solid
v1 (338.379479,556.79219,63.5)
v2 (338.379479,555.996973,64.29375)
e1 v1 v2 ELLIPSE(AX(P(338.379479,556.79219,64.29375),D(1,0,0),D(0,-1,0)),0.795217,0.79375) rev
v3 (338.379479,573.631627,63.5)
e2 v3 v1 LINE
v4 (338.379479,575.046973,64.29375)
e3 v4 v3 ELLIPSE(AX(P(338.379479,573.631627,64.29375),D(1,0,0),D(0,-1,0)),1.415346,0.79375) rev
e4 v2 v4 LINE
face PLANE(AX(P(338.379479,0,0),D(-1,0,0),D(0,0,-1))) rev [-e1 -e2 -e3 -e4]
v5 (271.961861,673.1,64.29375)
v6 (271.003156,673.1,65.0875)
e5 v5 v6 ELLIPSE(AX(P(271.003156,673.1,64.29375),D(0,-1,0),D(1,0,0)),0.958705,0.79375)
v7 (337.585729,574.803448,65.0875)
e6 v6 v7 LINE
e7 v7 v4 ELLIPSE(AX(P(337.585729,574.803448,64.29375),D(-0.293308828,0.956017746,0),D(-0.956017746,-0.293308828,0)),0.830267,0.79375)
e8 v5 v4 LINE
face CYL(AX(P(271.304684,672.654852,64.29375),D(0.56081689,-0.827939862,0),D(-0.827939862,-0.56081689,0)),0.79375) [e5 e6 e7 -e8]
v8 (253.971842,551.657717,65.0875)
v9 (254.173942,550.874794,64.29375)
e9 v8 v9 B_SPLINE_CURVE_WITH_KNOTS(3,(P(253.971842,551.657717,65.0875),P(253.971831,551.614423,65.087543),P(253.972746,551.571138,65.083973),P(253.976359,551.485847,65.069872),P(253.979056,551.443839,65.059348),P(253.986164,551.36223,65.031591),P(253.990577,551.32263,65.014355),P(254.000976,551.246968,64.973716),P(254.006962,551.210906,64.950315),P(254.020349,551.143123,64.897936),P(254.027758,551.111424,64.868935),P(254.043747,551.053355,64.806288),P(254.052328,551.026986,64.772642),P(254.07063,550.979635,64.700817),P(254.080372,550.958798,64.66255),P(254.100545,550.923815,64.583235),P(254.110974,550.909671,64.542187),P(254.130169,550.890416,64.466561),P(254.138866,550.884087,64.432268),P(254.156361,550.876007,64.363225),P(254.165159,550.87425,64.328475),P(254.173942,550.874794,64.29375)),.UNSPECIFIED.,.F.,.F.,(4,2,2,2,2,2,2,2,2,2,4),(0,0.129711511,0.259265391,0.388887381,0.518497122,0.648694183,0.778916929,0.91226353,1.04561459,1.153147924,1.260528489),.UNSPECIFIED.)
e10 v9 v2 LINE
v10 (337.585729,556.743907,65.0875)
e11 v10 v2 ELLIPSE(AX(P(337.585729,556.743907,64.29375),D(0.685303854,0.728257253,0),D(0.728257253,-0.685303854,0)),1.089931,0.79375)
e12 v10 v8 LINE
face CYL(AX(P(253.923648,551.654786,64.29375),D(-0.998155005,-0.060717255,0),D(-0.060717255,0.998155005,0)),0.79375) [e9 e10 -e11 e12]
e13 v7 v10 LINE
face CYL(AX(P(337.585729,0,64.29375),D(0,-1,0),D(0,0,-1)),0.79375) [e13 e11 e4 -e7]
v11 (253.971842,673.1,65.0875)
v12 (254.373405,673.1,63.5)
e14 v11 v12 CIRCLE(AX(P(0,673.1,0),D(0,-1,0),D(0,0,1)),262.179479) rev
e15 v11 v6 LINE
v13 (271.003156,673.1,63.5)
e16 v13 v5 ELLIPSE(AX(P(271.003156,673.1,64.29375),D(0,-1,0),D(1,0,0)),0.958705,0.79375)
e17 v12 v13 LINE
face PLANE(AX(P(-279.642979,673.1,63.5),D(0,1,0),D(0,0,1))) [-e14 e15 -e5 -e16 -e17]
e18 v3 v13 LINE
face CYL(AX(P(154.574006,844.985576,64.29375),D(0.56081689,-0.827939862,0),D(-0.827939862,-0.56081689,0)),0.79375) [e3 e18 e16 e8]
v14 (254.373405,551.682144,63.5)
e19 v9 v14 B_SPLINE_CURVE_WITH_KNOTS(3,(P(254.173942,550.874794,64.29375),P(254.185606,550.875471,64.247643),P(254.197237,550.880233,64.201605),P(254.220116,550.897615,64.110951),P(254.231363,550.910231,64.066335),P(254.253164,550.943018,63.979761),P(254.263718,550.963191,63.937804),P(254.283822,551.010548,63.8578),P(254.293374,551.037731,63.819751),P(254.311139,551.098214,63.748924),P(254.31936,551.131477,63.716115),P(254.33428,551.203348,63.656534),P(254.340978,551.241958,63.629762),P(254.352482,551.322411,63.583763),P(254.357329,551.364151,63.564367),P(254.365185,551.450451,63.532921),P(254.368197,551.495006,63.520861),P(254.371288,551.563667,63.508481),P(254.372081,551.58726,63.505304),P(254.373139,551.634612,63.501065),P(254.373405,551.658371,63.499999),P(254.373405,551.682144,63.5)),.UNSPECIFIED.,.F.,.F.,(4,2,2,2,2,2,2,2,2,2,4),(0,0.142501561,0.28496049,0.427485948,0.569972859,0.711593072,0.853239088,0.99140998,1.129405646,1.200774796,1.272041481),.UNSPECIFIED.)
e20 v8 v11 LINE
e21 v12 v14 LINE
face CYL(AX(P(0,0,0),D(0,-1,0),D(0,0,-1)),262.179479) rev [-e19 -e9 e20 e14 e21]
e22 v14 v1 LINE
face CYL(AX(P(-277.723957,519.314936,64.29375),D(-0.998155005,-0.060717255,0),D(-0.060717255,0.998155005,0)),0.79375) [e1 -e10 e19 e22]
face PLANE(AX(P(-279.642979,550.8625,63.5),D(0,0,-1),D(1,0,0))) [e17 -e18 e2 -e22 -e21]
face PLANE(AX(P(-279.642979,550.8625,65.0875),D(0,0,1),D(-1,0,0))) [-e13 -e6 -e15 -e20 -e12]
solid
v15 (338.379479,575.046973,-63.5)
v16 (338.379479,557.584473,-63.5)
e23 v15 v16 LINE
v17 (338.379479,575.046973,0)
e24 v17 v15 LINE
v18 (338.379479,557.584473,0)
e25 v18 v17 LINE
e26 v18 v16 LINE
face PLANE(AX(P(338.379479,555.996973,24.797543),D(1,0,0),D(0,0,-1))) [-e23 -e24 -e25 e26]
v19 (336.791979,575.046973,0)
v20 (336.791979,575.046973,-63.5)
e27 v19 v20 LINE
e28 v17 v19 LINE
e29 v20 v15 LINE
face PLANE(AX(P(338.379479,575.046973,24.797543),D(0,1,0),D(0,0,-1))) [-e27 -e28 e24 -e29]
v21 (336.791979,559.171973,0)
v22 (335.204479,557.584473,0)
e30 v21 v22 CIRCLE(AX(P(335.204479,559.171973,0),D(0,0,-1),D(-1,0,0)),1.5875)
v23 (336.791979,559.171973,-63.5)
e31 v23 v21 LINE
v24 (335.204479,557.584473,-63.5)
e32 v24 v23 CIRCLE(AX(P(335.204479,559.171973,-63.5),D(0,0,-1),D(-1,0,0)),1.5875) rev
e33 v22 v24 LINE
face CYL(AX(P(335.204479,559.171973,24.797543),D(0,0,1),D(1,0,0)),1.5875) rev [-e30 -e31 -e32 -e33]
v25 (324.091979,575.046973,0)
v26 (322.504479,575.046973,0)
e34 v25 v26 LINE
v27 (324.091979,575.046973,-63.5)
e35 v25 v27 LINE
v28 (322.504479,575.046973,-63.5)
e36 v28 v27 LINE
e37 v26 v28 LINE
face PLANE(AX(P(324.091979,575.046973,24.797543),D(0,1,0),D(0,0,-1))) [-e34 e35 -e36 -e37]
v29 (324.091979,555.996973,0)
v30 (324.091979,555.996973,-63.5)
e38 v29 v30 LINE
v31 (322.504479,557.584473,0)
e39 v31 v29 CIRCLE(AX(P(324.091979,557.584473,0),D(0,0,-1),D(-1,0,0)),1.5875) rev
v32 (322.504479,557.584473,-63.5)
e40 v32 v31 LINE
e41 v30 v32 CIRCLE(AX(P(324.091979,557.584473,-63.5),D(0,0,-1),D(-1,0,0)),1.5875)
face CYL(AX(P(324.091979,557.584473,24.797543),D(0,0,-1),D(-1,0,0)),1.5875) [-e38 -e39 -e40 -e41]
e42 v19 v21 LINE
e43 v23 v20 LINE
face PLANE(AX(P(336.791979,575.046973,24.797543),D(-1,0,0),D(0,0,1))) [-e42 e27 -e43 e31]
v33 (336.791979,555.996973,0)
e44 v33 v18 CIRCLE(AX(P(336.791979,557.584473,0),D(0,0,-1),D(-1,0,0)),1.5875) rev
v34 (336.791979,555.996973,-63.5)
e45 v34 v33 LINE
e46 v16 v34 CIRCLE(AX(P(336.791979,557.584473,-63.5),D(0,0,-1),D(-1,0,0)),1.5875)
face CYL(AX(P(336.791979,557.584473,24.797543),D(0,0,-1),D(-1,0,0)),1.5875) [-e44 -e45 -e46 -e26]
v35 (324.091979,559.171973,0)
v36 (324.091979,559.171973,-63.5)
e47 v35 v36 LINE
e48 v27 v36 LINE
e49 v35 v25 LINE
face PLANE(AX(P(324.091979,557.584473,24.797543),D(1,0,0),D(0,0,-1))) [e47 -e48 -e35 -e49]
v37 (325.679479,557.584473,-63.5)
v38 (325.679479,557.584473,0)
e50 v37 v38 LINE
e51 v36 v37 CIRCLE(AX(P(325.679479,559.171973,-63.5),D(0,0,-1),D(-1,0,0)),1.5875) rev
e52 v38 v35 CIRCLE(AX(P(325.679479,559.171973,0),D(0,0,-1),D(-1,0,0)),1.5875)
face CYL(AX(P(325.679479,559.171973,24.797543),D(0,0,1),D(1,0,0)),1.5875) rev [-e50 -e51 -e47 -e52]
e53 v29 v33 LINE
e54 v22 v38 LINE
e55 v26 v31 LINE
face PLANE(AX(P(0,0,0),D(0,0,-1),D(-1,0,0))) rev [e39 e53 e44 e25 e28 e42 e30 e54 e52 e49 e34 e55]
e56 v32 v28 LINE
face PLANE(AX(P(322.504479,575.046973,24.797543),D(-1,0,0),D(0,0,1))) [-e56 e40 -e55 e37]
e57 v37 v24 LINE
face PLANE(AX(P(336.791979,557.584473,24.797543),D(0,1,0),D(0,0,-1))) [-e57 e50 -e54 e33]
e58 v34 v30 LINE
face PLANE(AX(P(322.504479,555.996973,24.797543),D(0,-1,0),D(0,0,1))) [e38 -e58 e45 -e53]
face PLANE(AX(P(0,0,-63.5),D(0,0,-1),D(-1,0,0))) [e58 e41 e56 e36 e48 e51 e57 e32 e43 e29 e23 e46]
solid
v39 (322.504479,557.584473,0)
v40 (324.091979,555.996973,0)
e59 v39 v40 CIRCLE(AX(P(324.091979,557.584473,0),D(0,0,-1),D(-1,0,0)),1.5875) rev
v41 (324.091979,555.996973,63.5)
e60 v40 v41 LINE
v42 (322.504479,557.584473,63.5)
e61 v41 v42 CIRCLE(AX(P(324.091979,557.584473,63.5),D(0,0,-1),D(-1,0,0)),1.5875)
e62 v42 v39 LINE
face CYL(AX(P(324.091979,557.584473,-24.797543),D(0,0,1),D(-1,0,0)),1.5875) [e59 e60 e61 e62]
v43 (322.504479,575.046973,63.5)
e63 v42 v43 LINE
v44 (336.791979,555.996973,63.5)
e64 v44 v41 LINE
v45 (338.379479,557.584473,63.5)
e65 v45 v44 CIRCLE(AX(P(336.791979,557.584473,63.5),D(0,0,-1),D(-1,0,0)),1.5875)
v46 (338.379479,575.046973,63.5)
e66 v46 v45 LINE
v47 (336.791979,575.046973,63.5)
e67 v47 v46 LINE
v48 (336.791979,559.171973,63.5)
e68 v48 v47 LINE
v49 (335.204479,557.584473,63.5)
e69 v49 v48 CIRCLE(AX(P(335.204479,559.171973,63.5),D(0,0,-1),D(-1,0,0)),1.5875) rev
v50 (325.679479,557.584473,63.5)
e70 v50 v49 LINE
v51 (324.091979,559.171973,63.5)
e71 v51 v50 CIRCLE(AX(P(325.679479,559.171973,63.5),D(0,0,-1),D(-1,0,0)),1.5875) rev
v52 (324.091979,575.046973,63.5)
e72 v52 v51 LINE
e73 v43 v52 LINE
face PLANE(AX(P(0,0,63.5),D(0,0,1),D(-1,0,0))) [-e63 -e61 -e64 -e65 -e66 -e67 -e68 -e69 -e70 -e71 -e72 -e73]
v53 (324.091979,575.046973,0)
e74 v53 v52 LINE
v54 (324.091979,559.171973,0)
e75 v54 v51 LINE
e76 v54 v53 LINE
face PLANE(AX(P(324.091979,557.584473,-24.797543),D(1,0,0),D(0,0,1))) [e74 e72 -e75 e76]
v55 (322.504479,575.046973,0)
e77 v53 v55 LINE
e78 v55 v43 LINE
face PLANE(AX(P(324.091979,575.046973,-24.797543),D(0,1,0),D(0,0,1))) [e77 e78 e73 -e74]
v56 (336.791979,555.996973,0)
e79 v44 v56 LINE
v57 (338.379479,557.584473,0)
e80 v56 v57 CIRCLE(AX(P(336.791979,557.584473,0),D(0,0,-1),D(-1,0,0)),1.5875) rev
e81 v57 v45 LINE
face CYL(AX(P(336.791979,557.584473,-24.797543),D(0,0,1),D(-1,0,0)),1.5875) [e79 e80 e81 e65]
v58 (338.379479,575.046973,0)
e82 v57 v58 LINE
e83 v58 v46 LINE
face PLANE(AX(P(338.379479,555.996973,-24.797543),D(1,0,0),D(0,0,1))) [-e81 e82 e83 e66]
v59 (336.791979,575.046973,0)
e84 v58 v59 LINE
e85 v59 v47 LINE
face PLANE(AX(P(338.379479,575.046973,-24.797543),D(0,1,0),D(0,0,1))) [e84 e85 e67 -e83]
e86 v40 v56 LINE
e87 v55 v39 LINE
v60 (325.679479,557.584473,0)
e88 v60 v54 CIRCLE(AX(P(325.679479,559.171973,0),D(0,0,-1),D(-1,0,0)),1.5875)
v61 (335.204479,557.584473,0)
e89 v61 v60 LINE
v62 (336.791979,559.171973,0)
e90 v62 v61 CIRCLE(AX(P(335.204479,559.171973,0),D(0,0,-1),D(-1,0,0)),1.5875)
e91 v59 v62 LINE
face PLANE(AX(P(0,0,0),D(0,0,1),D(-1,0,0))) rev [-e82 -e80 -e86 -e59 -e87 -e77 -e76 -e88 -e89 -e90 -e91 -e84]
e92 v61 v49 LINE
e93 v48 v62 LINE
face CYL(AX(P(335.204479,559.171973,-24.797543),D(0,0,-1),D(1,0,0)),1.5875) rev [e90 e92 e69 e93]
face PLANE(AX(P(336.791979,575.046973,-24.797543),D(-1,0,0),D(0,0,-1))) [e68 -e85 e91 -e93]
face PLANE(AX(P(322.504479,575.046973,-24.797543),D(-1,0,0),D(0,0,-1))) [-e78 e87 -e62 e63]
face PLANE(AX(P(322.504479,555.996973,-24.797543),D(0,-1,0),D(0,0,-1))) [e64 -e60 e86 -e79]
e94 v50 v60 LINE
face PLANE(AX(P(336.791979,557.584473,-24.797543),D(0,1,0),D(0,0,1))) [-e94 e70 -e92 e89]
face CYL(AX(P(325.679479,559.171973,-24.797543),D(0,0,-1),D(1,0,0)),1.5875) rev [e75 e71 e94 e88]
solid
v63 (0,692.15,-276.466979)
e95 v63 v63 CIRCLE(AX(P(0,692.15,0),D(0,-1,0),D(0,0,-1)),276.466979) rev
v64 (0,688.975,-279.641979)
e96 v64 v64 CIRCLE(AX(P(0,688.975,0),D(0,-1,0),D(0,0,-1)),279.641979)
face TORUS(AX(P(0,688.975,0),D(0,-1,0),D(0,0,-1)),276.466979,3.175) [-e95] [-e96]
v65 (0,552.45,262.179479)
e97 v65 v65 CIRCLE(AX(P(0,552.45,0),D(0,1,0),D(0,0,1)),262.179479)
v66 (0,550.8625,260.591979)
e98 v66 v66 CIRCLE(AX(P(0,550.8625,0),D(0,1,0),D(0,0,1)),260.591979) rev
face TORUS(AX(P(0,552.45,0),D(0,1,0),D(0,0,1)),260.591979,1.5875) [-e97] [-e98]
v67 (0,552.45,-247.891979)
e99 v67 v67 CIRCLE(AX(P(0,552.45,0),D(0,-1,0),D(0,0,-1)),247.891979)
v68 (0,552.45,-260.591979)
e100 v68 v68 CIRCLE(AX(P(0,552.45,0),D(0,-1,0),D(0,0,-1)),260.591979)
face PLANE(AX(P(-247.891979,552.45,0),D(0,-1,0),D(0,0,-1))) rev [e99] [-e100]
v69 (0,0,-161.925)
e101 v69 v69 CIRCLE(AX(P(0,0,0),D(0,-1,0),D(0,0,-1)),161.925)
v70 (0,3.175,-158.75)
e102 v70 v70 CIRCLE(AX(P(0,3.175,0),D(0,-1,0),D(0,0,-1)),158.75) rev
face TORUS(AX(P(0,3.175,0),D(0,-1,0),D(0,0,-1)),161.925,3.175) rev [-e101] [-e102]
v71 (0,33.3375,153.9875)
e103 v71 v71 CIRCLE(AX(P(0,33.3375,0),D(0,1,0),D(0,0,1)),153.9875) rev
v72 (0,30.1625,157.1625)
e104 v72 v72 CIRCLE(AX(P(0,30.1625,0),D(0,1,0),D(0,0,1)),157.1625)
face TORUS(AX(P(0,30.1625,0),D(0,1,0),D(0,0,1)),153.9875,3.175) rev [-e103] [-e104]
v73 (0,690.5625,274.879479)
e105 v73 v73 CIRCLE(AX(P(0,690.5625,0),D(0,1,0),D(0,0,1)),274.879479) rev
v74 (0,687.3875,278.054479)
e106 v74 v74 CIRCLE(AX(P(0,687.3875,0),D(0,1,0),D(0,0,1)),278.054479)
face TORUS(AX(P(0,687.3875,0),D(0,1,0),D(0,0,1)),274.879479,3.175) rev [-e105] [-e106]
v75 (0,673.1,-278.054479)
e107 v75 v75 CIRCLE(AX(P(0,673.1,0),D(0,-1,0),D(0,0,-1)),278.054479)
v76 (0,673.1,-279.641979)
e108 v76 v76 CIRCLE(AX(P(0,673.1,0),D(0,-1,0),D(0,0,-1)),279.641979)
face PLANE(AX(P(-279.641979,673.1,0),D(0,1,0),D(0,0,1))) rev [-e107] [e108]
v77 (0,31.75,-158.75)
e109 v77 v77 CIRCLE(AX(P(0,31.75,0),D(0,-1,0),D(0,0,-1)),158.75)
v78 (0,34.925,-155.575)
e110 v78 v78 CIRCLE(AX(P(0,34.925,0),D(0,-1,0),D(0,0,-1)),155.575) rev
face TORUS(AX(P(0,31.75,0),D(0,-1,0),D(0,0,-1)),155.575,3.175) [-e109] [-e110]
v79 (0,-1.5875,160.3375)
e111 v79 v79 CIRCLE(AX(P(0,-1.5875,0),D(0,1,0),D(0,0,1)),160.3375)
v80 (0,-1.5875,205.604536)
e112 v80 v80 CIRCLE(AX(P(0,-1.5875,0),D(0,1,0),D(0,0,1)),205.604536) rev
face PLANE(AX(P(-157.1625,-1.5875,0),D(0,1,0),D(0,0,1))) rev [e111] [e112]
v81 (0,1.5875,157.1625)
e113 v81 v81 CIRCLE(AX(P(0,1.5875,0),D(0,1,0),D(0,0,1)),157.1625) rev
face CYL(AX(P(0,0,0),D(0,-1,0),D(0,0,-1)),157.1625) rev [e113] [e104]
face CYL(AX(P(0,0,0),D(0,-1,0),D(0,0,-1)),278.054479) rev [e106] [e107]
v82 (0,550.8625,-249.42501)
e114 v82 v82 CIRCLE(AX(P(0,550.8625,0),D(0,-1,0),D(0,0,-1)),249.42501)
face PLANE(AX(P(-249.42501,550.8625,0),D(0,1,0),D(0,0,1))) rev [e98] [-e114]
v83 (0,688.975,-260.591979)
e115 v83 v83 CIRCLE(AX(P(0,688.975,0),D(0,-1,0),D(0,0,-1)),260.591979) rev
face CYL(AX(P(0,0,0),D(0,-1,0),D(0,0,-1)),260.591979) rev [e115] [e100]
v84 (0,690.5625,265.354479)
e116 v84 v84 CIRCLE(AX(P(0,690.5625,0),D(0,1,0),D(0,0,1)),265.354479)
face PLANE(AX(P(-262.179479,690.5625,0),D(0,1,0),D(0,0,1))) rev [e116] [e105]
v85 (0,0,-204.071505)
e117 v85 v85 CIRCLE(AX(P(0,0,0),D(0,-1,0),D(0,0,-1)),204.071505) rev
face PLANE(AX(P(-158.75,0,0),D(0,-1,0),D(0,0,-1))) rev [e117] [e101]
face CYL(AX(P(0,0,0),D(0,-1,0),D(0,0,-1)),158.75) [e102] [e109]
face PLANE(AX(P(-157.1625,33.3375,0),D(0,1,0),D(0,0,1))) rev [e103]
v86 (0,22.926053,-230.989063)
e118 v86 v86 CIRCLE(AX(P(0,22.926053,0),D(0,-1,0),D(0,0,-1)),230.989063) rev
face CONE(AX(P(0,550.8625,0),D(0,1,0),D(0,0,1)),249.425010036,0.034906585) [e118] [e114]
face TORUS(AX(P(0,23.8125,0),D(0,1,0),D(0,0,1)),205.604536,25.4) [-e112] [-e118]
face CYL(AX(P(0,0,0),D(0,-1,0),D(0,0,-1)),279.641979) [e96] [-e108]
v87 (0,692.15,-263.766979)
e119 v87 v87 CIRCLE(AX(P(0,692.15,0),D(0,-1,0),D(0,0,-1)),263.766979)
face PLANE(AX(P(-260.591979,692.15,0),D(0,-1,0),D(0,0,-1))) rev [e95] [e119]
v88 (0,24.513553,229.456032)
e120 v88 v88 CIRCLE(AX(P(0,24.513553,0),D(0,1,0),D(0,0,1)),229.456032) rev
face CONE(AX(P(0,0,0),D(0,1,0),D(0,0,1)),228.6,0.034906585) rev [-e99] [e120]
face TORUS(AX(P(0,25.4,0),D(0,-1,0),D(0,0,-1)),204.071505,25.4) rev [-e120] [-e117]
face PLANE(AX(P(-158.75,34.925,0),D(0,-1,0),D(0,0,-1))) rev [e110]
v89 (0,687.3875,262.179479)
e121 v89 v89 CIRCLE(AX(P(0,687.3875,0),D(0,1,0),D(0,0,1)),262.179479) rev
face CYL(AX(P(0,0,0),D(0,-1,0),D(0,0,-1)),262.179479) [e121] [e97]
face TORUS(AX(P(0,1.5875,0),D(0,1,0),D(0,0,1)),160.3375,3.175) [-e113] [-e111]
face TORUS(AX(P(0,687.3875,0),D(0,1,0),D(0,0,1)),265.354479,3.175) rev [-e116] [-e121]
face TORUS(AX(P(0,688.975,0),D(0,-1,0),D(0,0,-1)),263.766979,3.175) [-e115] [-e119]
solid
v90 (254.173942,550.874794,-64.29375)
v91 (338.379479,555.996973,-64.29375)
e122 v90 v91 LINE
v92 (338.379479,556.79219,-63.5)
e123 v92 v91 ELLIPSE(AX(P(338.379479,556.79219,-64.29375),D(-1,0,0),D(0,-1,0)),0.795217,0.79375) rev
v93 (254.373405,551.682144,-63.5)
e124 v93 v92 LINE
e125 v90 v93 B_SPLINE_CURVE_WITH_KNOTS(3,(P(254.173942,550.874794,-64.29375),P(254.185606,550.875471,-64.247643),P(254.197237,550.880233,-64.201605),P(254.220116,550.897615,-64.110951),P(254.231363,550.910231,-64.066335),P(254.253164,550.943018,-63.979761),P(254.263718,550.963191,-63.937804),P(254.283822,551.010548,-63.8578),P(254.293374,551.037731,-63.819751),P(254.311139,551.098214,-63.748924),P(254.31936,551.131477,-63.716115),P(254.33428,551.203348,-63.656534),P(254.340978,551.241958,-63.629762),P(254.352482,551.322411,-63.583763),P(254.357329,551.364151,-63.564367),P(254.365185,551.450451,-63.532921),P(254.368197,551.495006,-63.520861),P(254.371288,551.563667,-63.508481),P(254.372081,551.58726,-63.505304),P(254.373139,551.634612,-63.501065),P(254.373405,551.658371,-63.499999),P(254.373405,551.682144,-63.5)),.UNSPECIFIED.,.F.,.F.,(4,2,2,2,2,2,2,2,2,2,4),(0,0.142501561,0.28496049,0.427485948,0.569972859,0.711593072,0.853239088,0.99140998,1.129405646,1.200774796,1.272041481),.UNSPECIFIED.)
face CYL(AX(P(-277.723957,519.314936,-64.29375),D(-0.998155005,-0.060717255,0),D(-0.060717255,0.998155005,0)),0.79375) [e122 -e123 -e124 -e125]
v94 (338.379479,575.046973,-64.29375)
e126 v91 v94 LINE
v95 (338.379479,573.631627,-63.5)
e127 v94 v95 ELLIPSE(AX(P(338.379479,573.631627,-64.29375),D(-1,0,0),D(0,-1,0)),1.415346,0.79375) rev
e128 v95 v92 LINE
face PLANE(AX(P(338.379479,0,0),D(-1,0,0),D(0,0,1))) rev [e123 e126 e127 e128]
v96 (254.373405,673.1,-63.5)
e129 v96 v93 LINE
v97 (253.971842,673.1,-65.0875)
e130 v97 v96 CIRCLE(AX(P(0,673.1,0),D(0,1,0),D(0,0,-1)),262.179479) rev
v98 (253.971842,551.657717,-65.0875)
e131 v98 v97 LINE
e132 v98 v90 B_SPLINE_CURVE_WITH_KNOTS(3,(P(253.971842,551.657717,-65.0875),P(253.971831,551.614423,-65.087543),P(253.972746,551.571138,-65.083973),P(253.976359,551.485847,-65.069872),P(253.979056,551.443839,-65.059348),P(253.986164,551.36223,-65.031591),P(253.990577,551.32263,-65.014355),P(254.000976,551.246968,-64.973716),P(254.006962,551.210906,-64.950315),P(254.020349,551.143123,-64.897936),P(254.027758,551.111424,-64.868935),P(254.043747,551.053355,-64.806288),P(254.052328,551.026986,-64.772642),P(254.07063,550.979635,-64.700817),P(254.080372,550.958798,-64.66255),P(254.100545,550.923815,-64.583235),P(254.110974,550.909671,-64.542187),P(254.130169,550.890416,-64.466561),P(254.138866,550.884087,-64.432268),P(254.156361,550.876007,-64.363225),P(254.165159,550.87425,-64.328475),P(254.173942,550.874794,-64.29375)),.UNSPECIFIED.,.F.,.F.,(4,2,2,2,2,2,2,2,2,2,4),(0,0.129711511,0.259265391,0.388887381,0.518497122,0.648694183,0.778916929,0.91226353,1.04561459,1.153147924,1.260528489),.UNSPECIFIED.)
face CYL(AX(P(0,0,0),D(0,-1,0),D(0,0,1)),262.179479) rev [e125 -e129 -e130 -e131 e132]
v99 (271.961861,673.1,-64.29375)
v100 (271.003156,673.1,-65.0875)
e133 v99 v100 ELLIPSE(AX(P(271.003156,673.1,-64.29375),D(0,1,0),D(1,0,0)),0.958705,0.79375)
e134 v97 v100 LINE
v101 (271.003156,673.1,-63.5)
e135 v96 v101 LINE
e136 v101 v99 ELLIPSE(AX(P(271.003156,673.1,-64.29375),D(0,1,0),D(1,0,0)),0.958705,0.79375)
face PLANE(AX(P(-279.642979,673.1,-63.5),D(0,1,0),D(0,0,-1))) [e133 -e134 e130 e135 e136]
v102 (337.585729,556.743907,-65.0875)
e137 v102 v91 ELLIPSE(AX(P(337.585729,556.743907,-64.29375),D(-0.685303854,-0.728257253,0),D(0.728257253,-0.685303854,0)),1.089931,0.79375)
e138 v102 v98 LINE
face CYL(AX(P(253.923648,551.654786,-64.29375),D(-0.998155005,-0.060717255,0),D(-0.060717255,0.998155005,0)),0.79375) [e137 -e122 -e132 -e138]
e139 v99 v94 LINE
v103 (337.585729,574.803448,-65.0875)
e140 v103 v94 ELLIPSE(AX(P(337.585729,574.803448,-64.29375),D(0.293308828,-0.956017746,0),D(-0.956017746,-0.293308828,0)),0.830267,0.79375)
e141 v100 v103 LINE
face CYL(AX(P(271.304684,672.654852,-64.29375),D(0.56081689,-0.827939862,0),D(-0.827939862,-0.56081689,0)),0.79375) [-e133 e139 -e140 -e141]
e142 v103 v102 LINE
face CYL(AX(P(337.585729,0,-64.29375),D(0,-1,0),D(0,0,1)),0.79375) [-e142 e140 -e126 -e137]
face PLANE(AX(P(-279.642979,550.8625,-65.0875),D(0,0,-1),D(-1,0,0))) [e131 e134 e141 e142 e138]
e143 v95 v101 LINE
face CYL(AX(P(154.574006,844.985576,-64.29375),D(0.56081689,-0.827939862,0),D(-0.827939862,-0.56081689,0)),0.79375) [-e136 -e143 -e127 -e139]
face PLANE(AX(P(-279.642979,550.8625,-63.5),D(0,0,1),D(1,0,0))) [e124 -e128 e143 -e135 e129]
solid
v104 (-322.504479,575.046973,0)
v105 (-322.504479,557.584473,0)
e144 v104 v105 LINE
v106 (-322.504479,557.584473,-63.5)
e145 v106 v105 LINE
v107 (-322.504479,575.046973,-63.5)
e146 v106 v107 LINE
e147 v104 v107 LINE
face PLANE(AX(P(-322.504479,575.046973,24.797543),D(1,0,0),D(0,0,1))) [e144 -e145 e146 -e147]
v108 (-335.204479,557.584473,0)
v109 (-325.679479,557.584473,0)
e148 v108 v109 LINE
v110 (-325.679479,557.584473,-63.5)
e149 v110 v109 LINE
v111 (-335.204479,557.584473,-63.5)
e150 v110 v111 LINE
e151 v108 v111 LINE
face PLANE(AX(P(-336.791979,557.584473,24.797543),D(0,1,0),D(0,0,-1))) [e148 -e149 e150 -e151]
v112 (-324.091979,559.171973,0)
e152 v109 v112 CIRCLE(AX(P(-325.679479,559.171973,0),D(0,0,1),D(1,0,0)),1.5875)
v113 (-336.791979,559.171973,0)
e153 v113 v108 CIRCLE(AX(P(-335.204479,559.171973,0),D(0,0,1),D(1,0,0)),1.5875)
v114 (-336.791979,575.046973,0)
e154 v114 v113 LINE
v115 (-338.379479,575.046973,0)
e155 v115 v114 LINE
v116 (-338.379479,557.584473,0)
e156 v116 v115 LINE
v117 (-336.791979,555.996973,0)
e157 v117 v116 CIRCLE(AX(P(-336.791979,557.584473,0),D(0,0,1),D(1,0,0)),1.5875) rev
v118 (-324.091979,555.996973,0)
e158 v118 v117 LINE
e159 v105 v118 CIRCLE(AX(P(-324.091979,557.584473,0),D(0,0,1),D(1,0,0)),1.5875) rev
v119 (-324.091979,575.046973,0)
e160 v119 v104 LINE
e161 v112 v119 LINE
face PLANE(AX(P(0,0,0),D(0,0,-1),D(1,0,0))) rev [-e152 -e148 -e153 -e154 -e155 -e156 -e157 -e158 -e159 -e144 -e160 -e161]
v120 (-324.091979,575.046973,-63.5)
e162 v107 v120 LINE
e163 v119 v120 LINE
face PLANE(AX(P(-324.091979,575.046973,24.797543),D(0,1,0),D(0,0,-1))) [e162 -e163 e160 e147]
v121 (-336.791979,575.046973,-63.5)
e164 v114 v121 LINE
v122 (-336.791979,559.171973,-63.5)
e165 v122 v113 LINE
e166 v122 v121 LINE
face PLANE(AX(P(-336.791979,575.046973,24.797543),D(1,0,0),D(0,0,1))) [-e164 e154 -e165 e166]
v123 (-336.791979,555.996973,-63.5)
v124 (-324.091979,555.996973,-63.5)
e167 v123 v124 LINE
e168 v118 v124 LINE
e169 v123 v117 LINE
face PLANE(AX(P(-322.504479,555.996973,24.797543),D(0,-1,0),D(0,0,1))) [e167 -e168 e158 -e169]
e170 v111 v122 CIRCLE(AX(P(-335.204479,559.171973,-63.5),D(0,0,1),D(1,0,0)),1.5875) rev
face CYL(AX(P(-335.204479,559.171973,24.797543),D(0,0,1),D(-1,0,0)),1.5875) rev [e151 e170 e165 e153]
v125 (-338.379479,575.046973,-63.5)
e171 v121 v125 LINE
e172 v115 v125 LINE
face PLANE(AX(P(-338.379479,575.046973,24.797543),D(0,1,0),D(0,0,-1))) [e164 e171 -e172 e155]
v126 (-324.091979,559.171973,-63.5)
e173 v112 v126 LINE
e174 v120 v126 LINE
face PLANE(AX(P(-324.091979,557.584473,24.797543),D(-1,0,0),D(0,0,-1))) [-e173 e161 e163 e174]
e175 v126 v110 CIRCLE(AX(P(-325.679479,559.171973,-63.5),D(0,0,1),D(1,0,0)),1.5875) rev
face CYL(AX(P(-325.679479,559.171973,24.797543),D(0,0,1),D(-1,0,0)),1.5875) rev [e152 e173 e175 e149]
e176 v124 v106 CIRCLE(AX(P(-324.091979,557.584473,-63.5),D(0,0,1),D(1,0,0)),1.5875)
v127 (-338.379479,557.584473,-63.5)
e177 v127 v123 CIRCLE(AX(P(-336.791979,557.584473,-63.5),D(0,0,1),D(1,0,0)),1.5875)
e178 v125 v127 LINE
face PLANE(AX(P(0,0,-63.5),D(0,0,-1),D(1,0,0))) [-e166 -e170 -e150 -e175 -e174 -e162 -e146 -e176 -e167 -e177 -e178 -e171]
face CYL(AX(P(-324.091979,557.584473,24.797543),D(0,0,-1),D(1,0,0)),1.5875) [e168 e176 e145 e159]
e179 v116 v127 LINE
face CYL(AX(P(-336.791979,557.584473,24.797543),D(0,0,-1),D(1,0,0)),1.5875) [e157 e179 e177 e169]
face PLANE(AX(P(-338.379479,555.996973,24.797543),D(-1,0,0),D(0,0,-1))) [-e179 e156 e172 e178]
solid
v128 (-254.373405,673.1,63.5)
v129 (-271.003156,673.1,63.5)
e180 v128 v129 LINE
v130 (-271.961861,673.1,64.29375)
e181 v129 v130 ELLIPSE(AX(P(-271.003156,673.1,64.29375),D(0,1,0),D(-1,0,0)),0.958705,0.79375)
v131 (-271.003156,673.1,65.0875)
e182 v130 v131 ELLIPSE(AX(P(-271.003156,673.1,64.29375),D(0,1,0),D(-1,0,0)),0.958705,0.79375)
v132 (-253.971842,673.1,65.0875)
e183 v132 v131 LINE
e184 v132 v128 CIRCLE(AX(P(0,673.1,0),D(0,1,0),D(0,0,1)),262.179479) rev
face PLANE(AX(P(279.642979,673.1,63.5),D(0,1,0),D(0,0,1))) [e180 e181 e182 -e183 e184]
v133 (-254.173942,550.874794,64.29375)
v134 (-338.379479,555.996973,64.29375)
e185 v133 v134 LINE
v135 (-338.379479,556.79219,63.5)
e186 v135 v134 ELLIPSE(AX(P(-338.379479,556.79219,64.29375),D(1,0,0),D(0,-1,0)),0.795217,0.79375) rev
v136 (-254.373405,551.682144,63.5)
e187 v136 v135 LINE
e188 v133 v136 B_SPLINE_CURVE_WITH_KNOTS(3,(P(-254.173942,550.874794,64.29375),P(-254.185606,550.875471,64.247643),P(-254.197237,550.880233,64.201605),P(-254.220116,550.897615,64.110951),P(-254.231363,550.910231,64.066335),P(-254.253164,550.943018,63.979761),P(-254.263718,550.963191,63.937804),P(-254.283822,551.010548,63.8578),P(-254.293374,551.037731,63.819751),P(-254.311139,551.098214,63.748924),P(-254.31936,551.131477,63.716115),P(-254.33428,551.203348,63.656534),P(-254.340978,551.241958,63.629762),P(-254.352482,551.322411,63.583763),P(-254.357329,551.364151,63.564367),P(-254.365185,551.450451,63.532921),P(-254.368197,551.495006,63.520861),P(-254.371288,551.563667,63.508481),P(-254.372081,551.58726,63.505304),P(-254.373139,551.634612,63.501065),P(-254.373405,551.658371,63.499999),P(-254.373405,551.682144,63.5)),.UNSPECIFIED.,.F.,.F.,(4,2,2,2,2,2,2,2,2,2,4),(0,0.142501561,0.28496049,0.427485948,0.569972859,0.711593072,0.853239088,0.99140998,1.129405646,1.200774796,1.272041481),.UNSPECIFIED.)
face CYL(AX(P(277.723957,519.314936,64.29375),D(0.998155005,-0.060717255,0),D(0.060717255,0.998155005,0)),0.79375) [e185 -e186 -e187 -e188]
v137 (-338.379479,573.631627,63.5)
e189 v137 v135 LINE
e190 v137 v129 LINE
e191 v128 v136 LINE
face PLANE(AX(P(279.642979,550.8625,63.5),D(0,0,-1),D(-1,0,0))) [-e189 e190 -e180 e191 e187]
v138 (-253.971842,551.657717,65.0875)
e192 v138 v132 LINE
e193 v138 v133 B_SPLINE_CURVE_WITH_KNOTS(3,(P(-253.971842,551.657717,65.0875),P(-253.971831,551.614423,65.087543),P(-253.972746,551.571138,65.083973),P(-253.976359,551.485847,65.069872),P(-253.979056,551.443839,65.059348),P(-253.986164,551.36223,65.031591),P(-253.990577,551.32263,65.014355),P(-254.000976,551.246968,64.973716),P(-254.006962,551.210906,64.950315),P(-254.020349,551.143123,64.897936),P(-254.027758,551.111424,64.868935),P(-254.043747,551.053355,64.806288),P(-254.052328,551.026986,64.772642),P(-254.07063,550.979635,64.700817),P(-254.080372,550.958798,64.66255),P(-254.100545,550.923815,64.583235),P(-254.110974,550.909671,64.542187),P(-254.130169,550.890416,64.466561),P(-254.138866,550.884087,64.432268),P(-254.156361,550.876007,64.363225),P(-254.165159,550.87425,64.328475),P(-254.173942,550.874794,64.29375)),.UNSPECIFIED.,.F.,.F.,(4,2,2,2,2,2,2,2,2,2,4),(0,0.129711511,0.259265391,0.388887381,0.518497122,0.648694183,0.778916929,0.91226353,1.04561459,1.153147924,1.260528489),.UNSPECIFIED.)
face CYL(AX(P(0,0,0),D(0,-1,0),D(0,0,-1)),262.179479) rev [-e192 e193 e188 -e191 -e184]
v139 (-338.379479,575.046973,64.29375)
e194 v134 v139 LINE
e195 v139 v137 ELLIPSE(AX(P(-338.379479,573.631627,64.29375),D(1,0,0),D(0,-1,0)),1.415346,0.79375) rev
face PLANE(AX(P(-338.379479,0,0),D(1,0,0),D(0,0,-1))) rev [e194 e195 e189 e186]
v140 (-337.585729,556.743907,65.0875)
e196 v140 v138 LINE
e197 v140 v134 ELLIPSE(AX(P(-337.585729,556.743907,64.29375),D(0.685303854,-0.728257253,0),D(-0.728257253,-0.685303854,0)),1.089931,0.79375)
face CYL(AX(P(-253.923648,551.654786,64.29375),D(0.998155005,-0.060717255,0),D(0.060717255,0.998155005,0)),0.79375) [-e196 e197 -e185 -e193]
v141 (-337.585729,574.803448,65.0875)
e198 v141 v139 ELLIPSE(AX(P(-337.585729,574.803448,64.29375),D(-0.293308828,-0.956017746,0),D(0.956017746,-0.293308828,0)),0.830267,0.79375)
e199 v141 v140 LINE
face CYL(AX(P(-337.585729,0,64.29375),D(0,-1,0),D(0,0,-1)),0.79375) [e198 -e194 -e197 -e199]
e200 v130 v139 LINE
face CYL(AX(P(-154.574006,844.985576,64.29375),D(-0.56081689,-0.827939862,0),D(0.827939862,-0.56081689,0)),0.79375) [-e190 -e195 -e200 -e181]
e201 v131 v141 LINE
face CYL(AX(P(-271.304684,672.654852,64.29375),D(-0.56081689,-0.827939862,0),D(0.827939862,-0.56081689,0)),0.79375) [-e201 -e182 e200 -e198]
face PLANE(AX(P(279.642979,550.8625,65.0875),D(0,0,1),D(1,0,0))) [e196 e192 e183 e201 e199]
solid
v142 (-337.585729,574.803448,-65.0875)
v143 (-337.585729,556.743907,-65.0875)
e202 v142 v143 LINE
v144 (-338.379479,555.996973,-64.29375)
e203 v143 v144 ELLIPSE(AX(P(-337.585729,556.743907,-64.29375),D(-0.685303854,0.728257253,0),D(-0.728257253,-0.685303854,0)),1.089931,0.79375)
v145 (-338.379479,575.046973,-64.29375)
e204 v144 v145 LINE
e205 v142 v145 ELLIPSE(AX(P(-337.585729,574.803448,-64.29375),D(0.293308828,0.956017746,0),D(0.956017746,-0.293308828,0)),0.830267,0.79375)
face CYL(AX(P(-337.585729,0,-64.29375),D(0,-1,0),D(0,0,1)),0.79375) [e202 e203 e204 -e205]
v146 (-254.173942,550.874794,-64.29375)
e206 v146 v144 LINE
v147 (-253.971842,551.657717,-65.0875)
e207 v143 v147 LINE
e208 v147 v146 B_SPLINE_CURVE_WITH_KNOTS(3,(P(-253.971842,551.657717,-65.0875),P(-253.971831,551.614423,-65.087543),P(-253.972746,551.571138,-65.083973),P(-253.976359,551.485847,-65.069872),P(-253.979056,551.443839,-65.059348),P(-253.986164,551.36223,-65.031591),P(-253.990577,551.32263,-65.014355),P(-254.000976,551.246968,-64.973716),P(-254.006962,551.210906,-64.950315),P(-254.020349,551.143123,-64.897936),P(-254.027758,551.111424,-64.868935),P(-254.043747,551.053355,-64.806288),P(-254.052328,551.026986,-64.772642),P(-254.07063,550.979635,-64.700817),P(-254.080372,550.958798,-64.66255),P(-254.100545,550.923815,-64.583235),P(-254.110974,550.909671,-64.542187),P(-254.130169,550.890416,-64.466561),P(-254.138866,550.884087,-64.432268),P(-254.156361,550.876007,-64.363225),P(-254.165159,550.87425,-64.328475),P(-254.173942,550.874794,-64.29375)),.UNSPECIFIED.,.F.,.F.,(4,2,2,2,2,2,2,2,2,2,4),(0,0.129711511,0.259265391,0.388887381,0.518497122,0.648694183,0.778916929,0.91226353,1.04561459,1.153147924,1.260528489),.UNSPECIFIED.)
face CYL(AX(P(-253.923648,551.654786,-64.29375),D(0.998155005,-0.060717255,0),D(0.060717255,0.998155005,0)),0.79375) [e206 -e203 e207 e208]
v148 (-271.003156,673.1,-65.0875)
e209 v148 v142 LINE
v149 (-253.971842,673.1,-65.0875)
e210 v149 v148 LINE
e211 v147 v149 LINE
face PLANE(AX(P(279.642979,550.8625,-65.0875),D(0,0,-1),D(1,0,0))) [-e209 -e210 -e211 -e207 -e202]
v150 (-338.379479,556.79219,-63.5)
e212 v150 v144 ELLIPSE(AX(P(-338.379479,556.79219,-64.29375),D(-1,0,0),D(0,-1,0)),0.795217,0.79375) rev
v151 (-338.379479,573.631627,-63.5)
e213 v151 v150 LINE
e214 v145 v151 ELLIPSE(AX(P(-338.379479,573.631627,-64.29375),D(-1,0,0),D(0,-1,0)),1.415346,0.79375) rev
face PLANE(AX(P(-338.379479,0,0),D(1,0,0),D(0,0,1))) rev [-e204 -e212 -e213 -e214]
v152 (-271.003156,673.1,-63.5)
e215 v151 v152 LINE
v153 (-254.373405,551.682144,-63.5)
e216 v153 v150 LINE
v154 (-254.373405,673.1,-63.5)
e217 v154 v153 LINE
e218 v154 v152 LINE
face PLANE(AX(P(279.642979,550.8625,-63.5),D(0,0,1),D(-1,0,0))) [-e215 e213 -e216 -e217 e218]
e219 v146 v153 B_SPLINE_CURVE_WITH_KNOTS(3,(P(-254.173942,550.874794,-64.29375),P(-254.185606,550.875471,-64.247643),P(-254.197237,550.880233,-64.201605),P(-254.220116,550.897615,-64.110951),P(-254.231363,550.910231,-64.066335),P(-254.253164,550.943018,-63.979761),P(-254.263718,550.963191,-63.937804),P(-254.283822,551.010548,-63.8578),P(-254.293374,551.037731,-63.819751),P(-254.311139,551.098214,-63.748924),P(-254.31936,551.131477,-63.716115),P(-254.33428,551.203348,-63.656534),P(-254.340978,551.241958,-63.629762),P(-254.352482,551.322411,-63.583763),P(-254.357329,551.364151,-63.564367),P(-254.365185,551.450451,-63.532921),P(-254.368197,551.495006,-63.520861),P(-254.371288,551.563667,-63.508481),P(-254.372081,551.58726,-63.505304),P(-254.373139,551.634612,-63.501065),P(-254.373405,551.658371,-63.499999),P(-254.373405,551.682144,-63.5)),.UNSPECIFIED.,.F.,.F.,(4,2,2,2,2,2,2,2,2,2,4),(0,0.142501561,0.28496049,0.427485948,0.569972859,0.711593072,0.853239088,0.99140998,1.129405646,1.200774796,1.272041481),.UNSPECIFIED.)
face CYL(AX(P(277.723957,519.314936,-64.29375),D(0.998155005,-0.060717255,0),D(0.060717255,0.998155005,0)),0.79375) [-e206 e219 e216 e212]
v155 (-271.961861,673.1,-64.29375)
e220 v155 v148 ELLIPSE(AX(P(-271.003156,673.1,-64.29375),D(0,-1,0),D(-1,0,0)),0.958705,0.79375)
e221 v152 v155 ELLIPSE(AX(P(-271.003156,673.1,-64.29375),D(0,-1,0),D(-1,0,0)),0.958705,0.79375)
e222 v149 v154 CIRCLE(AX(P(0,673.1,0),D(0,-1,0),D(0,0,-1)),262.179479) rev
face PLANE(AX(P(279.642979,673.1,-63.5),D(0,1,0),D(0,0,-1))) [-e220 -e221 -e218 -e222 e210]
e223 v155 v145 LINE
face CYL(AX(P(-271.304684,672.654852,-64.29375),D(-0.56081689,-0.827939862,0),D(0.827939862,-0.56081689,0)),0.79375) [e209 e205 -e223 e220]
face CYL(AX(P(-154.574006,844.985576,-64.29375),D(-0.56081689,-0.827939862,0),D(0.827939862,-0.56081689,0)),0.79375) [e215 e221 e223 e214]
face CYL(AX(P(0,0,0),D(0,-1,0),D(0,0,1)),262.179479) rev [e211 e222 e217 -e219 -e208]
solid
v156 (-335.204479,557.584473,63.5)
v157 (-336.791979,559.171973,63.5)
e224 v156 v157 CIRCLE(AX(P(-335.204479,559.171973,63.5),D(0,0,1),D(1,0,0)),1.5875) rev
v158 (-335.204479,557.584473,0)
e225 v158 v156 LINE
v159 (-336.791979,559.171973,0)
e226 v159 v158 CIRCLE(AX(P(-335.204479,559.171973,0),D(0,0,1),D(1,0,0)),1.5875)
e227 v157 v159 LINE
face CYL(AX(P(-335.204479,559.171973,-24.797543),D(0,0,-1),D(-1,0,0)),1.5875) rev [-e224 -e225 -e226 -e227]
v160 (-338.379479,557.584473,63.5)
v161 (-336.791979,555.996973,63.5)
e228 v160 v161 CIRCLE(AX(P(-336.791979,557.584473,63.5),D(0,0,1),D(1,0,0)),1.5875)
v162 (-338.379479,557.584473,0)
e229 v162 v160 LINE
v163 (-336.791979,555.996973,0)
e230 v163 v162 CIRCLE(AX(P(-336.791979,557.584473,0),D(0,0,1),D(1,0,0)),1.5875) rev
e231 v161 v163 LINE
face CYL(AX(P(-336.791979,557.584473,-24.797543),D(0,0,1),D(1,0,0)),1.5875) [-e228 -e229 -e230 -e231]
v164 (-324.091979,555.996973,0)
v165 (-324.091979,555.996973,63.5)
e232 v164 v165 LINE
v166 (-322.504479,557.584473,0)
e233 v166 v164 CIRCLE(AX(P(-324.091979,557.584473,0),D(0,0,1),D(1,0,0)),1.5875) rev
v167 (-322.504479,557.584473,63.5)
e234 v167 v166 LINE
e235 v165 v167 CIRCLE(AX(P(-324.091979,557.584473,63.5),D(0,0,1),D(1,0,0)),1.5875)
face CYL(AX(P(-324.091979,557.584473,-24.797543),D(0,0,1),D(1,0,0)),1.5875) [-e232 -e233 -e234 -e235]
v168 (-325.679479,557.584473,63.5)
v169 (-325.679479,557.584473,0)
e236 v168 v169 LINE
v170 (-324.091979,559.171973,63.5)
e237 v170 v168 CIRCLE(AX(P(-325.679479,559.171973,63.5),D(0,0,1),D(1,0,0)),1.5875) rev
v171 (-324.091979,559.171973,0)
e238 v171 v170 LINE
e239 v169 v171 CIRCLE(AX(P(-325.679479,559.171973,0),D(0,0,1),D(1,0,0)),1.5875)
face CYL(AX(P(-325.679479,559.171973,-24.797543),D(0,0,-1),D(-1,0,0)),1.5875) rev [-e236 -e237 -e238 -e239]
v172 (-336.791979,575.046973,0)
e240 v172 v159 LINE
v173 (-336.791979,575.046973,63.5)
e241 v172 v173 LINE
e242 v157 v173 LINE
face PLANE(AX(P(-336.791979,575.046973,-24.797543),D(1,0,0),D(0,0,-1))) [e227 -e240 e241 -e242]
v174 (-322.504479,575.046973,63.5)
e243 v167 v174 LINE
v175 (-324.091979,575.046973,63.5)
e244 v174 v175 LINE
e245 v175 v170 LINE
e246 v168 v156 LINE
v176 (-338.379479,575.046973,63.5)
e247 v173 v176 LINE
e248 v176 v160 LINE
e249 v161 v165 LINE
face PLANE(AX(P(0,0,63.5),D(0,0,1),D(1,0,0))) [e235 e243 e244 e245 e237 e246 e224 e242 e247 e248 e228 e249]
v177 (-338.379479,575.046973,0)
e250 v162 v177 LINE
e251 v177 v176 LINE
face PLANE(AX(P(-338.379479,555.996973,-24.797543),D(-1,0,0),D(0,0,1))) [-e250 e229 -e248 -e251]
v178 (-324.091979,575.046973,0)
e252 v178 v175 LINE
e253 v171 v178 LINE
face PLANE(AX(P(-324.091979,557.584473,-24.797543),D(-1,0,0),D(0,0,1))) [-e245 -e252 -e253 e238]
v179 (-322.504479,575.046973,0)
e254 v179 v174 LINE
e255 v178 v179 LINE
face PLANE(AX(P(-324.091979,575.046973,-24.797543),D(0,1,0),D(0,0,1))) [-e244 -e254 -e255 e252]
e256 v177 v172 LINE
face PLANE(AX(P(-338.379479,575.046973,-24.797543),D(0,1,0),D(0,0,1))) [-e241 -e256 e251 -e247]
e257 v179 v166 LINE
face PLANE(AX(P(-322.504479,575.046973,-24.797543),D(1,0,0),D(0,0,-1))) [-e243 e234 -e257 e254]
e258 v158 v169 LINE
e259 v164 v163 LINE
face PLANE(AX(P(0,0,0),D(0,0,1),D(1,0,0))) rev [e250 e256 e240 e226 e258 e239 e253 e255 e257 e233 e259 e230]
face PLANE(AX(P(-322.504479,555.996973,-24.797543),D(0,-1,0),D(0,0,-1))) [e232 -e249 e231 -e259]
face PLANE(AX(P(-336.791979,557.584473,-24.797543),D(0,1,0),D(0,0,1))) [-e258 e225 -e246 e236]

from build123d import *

# Parameters (mm, degrees)
FILLET3_R                = 3.175
FILLET4_R                = 25.4
BOSS_EXTRUDE1_DEPTH      = 63.5
BOSS_EXTRUDE3_REACH      = 971.135
BOSS_EXTRUDE3_END_RADIUS = 262.179479106
SKETCH5_W                = 1.5875
SKETCH5_H                = 122.2375
CUT_EXTRUDE1_DEPTH       = 1.5875
FILLET7_R                = 1.5875
FILLET11_R               = 1.5875
FILLET12_R               = 0.79375


with BuildPart() as part:
    # Sketch2 → Revolve2 (revolve)
    with BuildSketch(Plane.XY, mode=Mode.PRIVATE) as revolve2_sk:
        Polygon((-279.641979106, 673.1), (-278.054479106, 673.1), (-278.054479106, 690.5625), (-262.179479106, 690.5625), (-262.179479106, 550.8625), (-249.425010036, 550.8625), (-230.13303093, -1.5875), (-157.1625, -1.5875), (-157.1625, 33.3375), (0, 33.3375), (0, 34.925), (-158.75, 34.925), (-158.75, 0), (-228.6, 0), (-247.891979106, 552.45), (-260.591979106, 552.45), (-260.591979106, 692.15), (-279.641979106, 692.15), align=None)
    revolve(revolve2_sk.sketch.rotate(Axis((0, 0, 0), (0, 1, 0)), 270), axis=Axis((0, 0, 0), (0, 1, 0)))

    # Fillet3
    fillet3_edges = [part.edges().sort_by_distance(p)[0] for p in [
        (0, 692.15, 279.641979106),
        (0, 692.15, 260.591979106),
        (0, 0, 158.75),
        (0, 34.925, 158.75),
        (0, 33.3375, 157.1625),
        (0, -1.5875, 157.1625),
        (0, 690.5625, 262.179479106),
        (0, 690.5625, 278.054479106),
    ]]
    fillet(fillet3_edges, radius=FILLET3_R)

    # Fillet4
    fillet4_edges = [part.edges().sort_by_distance(p)[0] for p in [
        (0, 0, 228.6),
        (0, -1.5875, 230.13303093),
    ]]
    fillet(fillet4_edges, radius=FILLET4_R)

    # Fillet11
    fillet11_edges = [part.edges().sort_by_distance(p)[0] for p in [
        (0, 550.8625, 262.179479106),
    ]]
    fillet(fillet11_edges, radius=FILLET11_R)


with BuildPart() as body_2:
    # Sketch3 → Boss-Extrude1 (new body)
    with BuildSketch(Plane.XY.offset(63.5)):
        Polygon((-324.091979106, 557.584473052), (-324.091979106, 575.046973052), (-322.504479106, 575.046973052), (-322.504479106, 555.996973052), (-338.379479106, 555.996973052), (-338.379479106, 575.046973052), (-336.791979106, 575.046973052), (-336.791979106, 557.584473052), align=None)
    extrude(amount=-BOSS_EXTRUDE1_DEPTH)

    # Fillet7
    fillet7_edges = [body_2.edges().sort_by_distance(p)[0] for p in [
        (-336.791979106, 557.584473052, 31.75),
        (-338.379479106, 555.996973052, 31.75),
        (-322.504479106, 555.996973052, 31.75),
        (-324.091979106, 557.584473052, 31.75),
    ]]
    fillet(fillet7_edges, radius=FILLET7_R)


with BuildPart() as body_3:
    # Boss-Extrude3: up to this cylinder (the profile starts outside it)
    boss_extrude3_end = Plane(origin=(0, 611.98125, 0), z_dir=(0, -1, 0)) * Cylinder(BOSS_EXTRUDE3_END_RADIUS, 2467.628958211, mode=Mode.PRIVATE)
    # Sketch5 → Boss-Extrude3 (new, up to the surface)
    with BuildSketch(Plane.ZY.offset(338.379479106), mode=Mode.PRIVATE) as boss_extrude3_sk1:
        with Locations((64.29375, 611.98125)):
            Rectangle(SKETCH5_W, SKETCH5_H)
    boss_extrude3_tool1 = extrude(boss_extrude3_sk1.sketch, amount=-BOSS_EXTRUDE3_REACH, mode=Mode.PRIVATE) - boss_extrude3_end
    add(boss_extrude3_tool1.solids().sort_by_distance((-338.379479, 611.98125, 64.29375))[0])

    # Sketch6 → Cut-Extrude1 (cut)
    with BuildSketch(Plane.XY.offset(65.0875)):
        Polygon((-253.971842156, 550.8625), (-338.379479106, 555.996973052), (-338.379479106, 550.8625), align=None)
        Polygon((-338.379479106, 575.046973052), (-338.379479106, 673.1), (-271.961860969, 673.1), align=None)
    extrude(amount=-CUT_EXTRUDE1_DEPTH, mode=Mode.SUBTRACT)

    # Fillet12
    # the kernel refuses this fillet: 0.79375 mm, written as the material it takes off along each edge
    with BuildSketch(Plane(origin=(-252.392691343, 550.76644107, 63.5), x_dir=(0.0607172545305091, 0.9981550054987839, 0), z_dir=(-0.9981550054987839, 0.06071725453050909, 0))) as fillet12_piece_1:
        with BuildLine():
            CenterArc((FILLET12_R, -FILLET12_R), FILLET12_R, 90, 90)
            Line((0, -FILLET12_R), (0, 0))
            Line((0, 0), (FILLET12_R, 0))
        make_face()
    extrude(amount=88.130101153, mode=Mode.SUBTRACT)
    with BuildSketch(Plane(origin=(-251.991128317, 550.742014198, 65.0875), x_dir=(0.0607172545305091, 0.9981550054987839, 0), z_dir=(-0.9981550054987839, 0.06071725453050909, 0))) as fillet12_piece_2:
        with BuildLine():
            CenterArc((FILLET12_R, FILLET12_R), FILLET12_R, 180, 90)
            Line((0, FILLET12_R), (0, 0))
            Line((0, 0), (FILLET12_R, 0))
        make_face()
    extrude(amount=88.532406431, mode=Mode.SUBTRACT)
    with BuildSketch(Plane(origin=(-270.848989953, 674.742943165, 63.5), x_dir=(0.8279398624936091, -0.560816889986441, 0), z_dir=(-0.560816889986441, -0.8279398624936091, 0)), Plane(origin=(-270.848989953, 674.742943165, 65.0875), x_dir=(0, 0, -1), z_dir=(-0.560816889986441, -0.8279398624936091, 0))) as fillet12_piece_3:
        with BuildLine():
            CenterArc((FILLET12_R, FILLET12_R), FILLET12_R, 180, 90)
            Line((0, FILLET12_R), (0, 0))
            Line((0, 0), (FILLET12_R, 0))
        make_face()
    extrude(amount=122.398881692, mode=Mode.SUBTRACT)
    with BuildSketch(Plane(origin=(-338.379479106, 554.012598052, 65.0875), x_dir=(0, 0, -1), z_dir=(0, 1, 0))) as fillet12_piece_4:
        with BuildLine():
            CenterArc((FILLET12_R, -FILLET12_R), FILLET12_R, 90, 90)
            Line((0, -FILLET12_R), (0, 0))
            Line((0, 0), (FILLET12_R, 0))
        make_face()
    extrude(amount=23.01875, mode=Mode.SUBTRACT)


with BuildPart() as body_4:
    # Mirror11: mirrored copy
    add(body_3.part.mirror(Plane.XY))


with BuildPart() as body_5:
    # Mirror11 2: mirrored copy
    add(body_2.part.mirror(Plane.XY))


with BuildPart() as body_6:
    # Mirror12: mirrored copy
    add(body_3.part.mirror(Plane(origin=(0, 0, 0), x_dir=(0, 0, 1), z_dir=(1, 0, 0))))


with BuildPart() as body_7:
    # Mirror12 2: mirrored copy
    add(body_2.part.mirror(Plane(origin=(0, 0, 0), x_dir=(0, 0, 1), z_dir=(1, 0, 0))))


with BuildPart() as body_8:
    # Mirror12 3: mirrored copy
    add(body_5.part.mirror(Plane(origin=(0, 0, 0), x_dir=(0, 0, 1), z_dir=(1, 0, 0))))


with BuildPart() as body_9:
    # Mirror12 4: mirrored copy
    add(body_4.part.mirror(Plane(origin=(0, 0, 0), x_dir=(0, 0, 1), z_dir=(1, 0, 0))))


solid = Compound([part.part, body_2.part, body_3.part, body_4.part, body_5.part, body_6.part, body_7.part, body_8.part, body_9.part])
